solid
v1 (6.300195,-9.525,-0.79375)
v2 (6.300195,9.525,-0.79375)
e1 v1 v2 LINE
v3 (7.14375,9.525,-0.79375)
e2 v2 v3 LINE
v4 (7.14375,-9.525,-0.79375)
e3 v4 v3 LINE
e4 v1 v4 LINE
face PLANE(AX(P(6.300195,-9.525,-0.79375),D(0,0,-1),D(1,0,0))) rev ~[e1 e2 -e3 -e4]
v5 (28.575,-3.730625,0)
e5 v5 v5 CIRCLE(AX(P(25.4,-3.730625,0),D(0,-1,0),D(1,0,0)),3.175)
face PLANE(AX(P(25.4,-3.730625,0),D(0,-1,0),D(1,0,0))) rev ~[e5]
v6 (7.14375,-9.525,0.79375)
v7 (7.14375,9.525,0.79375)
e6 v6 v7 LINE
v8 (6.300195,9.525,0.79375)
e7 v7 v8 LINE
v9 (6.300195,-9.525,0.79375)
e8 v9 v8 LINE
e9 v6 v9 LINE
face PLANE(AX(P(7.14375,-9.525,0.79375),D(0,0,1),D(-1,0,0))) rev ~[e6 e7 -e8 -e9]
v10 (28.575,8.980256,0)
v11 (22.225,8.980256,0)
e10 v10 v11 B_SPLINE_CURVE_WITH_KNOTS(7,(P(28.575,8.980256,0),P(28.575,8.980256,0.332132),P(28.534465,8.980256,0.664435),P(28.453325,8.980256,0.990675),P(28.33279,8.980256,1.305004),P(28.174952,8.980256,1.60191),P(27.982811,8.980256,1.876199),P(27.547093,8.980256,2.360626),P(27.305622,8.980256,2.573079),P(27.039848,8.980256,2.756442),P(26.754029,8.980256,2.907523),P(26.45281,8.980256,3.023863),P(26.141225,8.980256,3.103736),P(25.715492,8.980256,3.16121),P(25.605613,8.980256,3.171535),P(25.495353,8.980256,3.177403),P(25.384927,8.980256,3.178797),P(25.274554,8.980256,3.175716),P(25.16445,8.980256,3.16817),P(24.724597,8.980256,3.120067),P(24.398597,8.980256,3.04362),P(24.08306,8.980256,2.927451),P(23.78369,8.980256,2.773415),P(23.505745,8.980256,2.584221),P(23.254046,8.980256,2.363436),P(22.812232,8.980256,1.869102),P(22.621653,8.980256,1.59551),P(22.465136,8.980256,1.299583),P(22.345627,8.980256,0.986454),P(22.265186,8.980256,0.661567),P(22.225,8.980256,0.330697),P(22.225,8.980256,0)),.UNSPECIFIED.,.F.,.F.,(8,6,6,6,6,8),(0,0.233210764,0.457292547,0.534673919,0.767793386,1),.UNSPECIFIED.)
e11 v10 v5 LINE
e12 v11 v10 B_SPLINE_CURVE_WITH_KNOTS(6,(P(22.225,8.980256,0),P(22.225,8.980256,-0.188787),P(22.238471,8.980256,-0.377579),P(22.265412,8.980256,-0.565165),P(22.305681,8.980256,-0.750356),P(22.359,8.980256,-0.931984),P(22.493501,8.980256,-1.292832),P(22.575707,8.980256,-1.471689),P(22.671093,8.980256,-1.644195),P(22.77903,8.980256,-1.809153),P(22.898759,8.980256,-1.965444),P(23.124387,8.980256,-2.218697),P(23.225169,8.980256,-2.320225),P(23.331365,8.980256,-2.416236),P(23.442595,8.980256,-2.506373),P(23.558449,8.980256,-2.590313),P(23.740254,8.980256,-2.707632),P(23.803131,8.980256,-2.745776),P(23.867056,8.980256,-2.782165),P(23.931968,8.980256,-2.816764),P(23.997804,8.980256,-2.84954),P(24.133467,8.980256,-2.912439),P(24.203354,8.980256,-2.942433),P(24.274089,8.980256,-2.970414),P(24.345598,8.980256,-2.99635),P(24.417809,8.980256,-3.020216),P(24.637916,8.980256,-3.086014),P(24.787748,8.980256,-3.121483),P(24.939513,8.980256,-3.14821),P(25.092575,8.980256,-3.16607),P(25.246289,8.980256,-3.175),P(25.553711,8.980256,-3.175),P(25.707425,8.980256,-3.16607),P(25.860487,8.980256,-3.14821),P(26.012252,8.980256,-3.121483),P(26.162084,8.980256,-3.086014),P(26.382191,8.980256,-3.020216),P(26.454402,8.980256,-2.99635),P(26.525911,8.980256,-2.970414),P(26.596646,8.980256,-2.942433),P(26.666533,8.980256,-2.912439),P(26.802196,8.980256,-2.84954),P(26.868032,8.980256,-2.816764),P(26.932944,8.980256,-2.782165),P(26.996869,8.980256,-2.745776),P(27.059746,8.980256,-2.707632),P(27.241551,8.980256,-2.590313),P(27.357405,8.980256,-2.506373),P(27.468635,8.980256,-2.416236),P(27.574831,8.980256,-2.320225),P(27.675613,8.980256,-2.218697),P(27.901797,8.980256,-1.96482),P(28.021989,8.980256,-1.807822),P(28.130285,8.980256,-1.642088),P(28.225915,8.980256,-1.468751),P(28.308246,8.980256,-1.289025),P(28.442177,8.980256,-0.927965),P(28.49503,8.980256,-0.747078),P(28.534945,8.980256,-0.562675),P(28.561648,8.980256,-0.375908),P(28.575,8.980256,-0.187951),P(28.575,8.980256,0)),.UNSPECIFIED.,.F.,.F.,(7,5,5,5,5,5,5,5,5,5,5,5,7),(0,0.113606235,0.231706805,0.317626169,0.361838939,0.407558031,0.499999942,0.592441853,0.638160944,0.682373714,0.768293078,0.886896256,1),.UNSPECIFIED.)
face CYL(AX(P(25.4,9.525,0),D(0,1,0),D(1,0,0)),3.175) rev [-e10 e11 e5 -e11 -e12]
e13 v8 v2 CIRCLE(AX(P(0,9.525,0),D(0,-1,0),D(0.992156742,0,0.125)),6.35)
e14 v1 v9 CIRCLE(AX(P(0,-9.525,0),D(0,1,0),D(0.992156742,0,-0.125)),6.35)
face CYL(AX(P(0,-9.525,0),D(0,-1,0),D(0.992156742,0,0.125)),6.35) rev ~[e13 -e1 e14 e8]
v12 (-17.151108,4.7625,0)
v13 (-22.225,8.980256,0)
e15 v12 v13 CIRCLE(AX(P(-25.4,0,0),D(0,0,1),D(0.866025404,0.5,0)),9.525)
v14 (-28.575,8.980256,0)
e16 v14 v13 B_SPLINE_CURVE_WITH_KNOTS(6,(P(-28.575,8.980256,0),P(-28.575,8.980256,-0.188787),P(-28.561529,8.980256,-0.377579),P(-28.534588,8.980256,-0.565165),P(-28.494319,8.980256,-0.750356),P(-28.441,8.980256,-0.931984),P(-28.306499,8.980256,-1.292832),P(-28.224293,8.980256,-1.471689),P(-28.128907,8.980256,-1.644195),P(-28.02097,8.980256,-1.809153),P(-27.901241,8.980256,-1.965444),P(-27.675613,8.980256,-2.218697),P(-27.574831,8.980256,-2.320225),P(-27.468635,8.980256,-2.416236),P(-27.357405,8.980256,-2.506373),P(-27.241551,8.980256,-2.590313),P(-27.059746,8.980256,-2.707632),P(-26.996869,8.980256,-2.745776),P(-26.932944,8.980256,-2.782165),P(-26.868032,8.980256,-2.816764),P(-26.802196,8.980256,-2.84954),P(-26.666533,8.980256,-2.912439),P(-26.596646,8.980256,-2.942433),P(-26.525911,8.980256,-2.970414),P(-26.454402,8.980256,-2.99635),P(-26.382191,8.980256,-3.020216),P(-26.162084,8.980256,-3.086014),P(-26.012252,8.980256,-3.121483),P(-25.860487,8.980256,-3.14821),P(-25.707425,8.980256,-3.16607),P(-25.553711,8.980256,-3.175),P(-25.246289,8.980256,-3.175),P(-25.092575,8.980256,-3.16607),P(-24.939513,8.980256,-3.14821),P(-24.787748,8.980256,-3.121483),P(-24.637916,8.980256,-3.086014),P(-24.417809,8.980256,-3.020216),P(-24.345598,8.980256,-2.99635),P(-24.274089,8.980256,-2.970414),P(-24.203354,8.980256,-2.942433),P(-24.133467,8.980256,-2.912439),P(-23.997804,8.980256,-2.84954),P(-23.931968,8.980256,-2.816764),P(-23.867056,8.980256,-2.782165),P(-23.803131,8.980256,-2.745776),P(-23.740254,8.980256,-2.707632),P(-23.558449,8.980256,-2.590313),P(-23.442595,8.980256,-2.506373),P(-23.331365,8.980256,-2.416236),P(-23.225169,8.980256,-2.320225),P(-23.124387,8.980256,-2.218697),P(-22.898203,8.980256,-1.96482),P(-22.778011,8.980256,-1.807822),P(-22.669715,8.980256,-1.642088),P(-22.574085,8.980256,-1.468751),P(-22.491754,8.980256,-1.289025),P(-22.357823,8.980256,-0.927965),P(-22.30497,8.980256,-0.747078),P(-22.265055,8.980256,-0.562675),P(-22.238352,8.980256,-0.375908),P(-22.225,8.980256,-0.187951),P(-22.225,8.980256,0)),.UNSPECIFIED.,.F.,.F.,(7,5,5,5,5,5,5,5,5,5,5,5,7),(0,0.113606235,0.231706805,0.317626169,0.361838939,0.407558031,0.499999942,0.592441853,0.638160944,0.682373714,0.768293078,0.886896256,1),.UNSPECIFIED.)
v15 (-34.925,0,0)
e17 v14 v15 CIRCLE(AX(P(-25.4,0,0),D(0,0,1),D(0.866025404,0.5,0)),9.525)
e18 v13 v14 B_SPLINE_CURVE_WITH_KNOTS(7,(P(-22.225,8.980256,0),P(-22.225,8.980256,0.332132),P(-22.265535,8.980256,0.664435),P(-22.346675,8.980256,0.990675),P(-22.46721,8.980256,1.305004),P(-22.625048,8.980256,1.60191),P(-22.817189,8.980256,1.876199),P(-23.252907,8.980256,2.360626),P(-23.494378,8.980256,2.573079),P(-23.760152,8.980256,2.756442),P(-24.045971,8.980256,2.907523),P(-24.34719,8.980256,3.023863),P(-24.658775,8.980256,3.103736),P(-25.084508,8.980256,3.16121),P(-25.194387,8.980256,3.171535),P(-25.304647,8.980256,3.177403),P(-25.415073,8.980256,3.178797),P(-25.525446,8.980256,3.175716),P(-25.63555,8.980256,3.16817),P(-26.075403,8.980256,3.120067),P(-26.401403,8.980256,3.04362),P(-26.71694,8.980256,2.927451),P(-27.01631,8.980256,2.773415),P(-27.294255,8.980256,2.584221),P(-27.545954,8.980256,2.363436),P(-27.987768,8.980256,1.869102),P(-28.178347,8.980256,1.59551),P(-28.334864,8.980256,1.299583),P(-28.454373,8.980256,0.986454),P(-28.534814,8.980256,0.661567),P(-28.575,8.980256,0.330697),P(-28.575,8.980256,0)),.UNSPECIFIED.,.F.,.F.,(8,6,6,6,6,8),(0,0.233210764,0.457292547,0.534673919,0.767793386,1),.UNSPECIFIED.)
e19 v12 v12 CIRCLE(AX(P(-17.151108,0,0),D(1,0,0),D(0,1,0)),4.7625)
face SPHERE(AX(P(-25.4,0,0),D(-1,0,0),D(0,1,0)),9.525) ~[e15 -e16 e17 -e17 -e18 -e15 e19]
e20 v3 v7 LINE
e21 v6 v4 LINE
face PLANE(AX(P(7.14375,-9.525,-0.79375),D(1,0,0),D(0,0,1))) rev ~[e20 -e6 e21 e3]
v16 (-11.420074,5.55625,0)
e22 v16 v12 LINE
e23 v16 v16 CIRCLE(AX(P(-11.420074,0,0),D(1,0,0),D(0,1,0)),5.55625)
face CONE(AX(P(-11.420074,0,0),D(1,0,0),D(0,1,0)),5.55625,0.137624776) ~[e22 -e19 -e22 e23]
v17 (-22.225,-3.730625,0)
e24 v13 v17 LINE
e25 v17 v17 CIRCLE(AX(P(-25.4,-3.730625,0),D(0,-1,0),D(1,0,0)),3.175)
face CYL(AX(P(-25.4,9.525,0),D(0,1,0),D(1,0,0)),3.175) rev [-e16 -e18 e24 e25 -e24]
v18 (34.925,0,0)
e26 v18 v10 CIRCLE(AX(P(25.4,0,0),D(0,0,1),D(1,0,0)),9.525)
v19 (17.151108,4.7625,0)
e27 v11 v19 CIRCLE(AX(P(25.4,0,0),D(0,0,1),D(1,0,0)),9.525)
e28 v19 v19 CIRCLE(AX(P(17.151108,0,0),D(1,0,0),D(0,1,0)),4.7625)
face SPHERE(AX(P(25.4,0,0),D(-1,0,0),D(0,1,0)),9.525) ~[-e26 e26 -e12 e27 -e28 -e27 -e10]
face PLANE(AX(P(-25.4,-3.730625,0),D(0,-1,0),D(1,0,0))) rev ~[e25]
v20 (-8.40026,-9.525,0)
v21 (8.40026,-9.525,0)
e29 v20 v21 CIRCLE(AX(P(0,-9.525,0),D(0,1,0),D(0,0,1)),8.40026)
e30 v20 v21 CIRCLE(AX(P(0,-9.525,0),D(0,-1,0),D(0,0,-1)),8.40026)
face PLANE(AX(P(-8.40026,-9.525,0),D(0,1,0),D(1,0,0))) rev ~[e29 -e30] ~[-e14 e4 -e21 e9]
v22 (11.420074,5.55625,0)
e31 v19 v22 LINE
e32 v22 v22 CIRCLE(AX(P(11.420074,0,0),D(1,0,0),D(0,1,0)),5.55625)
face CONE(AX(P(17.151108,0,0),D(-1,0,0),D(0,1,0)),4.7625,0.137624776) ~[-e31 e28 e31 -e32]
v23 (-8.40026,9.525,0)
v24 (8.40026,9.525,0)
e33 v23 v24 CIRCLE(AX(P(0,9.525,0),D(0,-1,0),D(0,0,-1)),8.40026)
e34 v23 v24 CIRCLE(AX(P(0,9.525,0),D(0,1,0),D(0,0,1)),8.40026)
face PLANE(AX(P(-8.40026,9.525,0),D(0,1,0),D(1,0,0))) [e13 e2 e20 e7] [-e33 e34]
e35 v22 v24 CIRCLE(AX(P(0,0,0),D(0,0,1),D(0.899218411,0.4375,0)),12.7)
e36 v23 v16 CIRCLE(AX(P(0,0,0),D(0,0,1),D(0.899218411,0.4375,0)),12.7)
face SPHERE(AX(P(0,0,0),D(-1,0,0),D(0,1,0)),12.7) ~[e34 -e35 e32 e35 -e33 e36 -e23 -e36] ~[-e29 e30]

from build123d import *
from build123d import SkipClean  # not in build123d's __all__

# Parameters (mm, degrees)
F8_W          = 16.8005208253
F8_H          = 3.175
F1_DEPTH      = 12.701
F1_DEPTH_BACK = 12.701
F3_DEPTH      = 19.05
F5_R          = 3.175
F6_DEPTH      = 13.255625


with BuildPart() as f7:
    # F0 (on Top) → F7 (revolve)
    with BuildSketch(Plane.XY):
        with BuildLine():
            Line((17.151108029, 4.7625), (11.4200738149, 5.55625))
            ThreePointArc((11.4200738149, 5.55625), (0, 12.7), (-11.4200738149, 5.55625))
            Line((-11.4200738149, 5.55625), (-17.151108029, 4.7625))
            ThreePointArc((-17.151108029, 4.7625), (-27.8652514046, 9.2004434954), (-34.925, 0))
            Line((-34.925, 0), (34.925, 0))
            ThreePointArc((34.925, 0), (27.8652514046, 9.2004434954), (17.151108029, 4.7625))
        make_face()
    revolve(axis=Axis((0, 0, 0), (1, 0, 0)))

    # F8 (on Top) → F1 (cut, two sides)
    with BuildSketch(Plane.XY) as f1_sk:
        with Locations((0, 11.1125)):
            Rectangle(F8_W, F8_H)
        with Locations((0, -11.1125)):
            Rectangle(F8_W, F8_H)
    with SkipClean():  # cleaning this boolean's faces spoils the solid; the shape is the same uncleaned
        extrude(amount=F1_DEPTH, mode=Mode.SUBTRACT)
        extrude(f1_sk.sketch, amount=-F1_DEPTH_BACK, mode=Mode.SUBTRACT)

    # F2 (on face) → F3 (cut, through all)
    with BuildSketch(Plane.XZ.offset(9.525)):
        with BuildLine():
            ThreePointArc((6.3001953095, -0.79375), (6.3375365962, -0.3976554946), (6.35, 0))
            ThreePointArc((6.35, 0), (6.3375365962, 0.3976554946), (6.3001953095, 0.79375))
            ThreePointArc((6.3001953095, 0.79375), (-6.35, 0), (6.3001953095, -0.79375))
        make_face()
        with BuildLine():
            ThreePointArc((6.3001953095, 0.79375), (6.3375365962, 0.3976554946), (6.35, 0))
            ThreePointArc((6.35, 0), (6.3375365962, -0.3976554946), (6.3001953095, -0.79375))
            Line((6.3001953095, -0.79375), (7.14375, -0.79375))
            Line((7.14375, -0.79375), (7.14375, 0.79375))
            Line((7.14375, 0.79375), (6.3001953095, 0.79375))
        make_face()
    with SkipClean():  # cleaning this boolean's faces spoils the solid; the shape is the same uncleaned
        extrude(amount=-F3_DEPTH, mode=Mode.SUBTRACT)

    # F5 (on plane+point) → F6 (cut)
    with BuildSketch(Plane.XZ.offset(-9.525)):
        with Locations((25.4, 0)):
            Circle(F5_R)
        with Locations((-25.4, 0)):
            Circle(F5_R)
    extrude(amount=F6_DEPTH, mode=Mode.SUBTRACT)


solid = f7.part
